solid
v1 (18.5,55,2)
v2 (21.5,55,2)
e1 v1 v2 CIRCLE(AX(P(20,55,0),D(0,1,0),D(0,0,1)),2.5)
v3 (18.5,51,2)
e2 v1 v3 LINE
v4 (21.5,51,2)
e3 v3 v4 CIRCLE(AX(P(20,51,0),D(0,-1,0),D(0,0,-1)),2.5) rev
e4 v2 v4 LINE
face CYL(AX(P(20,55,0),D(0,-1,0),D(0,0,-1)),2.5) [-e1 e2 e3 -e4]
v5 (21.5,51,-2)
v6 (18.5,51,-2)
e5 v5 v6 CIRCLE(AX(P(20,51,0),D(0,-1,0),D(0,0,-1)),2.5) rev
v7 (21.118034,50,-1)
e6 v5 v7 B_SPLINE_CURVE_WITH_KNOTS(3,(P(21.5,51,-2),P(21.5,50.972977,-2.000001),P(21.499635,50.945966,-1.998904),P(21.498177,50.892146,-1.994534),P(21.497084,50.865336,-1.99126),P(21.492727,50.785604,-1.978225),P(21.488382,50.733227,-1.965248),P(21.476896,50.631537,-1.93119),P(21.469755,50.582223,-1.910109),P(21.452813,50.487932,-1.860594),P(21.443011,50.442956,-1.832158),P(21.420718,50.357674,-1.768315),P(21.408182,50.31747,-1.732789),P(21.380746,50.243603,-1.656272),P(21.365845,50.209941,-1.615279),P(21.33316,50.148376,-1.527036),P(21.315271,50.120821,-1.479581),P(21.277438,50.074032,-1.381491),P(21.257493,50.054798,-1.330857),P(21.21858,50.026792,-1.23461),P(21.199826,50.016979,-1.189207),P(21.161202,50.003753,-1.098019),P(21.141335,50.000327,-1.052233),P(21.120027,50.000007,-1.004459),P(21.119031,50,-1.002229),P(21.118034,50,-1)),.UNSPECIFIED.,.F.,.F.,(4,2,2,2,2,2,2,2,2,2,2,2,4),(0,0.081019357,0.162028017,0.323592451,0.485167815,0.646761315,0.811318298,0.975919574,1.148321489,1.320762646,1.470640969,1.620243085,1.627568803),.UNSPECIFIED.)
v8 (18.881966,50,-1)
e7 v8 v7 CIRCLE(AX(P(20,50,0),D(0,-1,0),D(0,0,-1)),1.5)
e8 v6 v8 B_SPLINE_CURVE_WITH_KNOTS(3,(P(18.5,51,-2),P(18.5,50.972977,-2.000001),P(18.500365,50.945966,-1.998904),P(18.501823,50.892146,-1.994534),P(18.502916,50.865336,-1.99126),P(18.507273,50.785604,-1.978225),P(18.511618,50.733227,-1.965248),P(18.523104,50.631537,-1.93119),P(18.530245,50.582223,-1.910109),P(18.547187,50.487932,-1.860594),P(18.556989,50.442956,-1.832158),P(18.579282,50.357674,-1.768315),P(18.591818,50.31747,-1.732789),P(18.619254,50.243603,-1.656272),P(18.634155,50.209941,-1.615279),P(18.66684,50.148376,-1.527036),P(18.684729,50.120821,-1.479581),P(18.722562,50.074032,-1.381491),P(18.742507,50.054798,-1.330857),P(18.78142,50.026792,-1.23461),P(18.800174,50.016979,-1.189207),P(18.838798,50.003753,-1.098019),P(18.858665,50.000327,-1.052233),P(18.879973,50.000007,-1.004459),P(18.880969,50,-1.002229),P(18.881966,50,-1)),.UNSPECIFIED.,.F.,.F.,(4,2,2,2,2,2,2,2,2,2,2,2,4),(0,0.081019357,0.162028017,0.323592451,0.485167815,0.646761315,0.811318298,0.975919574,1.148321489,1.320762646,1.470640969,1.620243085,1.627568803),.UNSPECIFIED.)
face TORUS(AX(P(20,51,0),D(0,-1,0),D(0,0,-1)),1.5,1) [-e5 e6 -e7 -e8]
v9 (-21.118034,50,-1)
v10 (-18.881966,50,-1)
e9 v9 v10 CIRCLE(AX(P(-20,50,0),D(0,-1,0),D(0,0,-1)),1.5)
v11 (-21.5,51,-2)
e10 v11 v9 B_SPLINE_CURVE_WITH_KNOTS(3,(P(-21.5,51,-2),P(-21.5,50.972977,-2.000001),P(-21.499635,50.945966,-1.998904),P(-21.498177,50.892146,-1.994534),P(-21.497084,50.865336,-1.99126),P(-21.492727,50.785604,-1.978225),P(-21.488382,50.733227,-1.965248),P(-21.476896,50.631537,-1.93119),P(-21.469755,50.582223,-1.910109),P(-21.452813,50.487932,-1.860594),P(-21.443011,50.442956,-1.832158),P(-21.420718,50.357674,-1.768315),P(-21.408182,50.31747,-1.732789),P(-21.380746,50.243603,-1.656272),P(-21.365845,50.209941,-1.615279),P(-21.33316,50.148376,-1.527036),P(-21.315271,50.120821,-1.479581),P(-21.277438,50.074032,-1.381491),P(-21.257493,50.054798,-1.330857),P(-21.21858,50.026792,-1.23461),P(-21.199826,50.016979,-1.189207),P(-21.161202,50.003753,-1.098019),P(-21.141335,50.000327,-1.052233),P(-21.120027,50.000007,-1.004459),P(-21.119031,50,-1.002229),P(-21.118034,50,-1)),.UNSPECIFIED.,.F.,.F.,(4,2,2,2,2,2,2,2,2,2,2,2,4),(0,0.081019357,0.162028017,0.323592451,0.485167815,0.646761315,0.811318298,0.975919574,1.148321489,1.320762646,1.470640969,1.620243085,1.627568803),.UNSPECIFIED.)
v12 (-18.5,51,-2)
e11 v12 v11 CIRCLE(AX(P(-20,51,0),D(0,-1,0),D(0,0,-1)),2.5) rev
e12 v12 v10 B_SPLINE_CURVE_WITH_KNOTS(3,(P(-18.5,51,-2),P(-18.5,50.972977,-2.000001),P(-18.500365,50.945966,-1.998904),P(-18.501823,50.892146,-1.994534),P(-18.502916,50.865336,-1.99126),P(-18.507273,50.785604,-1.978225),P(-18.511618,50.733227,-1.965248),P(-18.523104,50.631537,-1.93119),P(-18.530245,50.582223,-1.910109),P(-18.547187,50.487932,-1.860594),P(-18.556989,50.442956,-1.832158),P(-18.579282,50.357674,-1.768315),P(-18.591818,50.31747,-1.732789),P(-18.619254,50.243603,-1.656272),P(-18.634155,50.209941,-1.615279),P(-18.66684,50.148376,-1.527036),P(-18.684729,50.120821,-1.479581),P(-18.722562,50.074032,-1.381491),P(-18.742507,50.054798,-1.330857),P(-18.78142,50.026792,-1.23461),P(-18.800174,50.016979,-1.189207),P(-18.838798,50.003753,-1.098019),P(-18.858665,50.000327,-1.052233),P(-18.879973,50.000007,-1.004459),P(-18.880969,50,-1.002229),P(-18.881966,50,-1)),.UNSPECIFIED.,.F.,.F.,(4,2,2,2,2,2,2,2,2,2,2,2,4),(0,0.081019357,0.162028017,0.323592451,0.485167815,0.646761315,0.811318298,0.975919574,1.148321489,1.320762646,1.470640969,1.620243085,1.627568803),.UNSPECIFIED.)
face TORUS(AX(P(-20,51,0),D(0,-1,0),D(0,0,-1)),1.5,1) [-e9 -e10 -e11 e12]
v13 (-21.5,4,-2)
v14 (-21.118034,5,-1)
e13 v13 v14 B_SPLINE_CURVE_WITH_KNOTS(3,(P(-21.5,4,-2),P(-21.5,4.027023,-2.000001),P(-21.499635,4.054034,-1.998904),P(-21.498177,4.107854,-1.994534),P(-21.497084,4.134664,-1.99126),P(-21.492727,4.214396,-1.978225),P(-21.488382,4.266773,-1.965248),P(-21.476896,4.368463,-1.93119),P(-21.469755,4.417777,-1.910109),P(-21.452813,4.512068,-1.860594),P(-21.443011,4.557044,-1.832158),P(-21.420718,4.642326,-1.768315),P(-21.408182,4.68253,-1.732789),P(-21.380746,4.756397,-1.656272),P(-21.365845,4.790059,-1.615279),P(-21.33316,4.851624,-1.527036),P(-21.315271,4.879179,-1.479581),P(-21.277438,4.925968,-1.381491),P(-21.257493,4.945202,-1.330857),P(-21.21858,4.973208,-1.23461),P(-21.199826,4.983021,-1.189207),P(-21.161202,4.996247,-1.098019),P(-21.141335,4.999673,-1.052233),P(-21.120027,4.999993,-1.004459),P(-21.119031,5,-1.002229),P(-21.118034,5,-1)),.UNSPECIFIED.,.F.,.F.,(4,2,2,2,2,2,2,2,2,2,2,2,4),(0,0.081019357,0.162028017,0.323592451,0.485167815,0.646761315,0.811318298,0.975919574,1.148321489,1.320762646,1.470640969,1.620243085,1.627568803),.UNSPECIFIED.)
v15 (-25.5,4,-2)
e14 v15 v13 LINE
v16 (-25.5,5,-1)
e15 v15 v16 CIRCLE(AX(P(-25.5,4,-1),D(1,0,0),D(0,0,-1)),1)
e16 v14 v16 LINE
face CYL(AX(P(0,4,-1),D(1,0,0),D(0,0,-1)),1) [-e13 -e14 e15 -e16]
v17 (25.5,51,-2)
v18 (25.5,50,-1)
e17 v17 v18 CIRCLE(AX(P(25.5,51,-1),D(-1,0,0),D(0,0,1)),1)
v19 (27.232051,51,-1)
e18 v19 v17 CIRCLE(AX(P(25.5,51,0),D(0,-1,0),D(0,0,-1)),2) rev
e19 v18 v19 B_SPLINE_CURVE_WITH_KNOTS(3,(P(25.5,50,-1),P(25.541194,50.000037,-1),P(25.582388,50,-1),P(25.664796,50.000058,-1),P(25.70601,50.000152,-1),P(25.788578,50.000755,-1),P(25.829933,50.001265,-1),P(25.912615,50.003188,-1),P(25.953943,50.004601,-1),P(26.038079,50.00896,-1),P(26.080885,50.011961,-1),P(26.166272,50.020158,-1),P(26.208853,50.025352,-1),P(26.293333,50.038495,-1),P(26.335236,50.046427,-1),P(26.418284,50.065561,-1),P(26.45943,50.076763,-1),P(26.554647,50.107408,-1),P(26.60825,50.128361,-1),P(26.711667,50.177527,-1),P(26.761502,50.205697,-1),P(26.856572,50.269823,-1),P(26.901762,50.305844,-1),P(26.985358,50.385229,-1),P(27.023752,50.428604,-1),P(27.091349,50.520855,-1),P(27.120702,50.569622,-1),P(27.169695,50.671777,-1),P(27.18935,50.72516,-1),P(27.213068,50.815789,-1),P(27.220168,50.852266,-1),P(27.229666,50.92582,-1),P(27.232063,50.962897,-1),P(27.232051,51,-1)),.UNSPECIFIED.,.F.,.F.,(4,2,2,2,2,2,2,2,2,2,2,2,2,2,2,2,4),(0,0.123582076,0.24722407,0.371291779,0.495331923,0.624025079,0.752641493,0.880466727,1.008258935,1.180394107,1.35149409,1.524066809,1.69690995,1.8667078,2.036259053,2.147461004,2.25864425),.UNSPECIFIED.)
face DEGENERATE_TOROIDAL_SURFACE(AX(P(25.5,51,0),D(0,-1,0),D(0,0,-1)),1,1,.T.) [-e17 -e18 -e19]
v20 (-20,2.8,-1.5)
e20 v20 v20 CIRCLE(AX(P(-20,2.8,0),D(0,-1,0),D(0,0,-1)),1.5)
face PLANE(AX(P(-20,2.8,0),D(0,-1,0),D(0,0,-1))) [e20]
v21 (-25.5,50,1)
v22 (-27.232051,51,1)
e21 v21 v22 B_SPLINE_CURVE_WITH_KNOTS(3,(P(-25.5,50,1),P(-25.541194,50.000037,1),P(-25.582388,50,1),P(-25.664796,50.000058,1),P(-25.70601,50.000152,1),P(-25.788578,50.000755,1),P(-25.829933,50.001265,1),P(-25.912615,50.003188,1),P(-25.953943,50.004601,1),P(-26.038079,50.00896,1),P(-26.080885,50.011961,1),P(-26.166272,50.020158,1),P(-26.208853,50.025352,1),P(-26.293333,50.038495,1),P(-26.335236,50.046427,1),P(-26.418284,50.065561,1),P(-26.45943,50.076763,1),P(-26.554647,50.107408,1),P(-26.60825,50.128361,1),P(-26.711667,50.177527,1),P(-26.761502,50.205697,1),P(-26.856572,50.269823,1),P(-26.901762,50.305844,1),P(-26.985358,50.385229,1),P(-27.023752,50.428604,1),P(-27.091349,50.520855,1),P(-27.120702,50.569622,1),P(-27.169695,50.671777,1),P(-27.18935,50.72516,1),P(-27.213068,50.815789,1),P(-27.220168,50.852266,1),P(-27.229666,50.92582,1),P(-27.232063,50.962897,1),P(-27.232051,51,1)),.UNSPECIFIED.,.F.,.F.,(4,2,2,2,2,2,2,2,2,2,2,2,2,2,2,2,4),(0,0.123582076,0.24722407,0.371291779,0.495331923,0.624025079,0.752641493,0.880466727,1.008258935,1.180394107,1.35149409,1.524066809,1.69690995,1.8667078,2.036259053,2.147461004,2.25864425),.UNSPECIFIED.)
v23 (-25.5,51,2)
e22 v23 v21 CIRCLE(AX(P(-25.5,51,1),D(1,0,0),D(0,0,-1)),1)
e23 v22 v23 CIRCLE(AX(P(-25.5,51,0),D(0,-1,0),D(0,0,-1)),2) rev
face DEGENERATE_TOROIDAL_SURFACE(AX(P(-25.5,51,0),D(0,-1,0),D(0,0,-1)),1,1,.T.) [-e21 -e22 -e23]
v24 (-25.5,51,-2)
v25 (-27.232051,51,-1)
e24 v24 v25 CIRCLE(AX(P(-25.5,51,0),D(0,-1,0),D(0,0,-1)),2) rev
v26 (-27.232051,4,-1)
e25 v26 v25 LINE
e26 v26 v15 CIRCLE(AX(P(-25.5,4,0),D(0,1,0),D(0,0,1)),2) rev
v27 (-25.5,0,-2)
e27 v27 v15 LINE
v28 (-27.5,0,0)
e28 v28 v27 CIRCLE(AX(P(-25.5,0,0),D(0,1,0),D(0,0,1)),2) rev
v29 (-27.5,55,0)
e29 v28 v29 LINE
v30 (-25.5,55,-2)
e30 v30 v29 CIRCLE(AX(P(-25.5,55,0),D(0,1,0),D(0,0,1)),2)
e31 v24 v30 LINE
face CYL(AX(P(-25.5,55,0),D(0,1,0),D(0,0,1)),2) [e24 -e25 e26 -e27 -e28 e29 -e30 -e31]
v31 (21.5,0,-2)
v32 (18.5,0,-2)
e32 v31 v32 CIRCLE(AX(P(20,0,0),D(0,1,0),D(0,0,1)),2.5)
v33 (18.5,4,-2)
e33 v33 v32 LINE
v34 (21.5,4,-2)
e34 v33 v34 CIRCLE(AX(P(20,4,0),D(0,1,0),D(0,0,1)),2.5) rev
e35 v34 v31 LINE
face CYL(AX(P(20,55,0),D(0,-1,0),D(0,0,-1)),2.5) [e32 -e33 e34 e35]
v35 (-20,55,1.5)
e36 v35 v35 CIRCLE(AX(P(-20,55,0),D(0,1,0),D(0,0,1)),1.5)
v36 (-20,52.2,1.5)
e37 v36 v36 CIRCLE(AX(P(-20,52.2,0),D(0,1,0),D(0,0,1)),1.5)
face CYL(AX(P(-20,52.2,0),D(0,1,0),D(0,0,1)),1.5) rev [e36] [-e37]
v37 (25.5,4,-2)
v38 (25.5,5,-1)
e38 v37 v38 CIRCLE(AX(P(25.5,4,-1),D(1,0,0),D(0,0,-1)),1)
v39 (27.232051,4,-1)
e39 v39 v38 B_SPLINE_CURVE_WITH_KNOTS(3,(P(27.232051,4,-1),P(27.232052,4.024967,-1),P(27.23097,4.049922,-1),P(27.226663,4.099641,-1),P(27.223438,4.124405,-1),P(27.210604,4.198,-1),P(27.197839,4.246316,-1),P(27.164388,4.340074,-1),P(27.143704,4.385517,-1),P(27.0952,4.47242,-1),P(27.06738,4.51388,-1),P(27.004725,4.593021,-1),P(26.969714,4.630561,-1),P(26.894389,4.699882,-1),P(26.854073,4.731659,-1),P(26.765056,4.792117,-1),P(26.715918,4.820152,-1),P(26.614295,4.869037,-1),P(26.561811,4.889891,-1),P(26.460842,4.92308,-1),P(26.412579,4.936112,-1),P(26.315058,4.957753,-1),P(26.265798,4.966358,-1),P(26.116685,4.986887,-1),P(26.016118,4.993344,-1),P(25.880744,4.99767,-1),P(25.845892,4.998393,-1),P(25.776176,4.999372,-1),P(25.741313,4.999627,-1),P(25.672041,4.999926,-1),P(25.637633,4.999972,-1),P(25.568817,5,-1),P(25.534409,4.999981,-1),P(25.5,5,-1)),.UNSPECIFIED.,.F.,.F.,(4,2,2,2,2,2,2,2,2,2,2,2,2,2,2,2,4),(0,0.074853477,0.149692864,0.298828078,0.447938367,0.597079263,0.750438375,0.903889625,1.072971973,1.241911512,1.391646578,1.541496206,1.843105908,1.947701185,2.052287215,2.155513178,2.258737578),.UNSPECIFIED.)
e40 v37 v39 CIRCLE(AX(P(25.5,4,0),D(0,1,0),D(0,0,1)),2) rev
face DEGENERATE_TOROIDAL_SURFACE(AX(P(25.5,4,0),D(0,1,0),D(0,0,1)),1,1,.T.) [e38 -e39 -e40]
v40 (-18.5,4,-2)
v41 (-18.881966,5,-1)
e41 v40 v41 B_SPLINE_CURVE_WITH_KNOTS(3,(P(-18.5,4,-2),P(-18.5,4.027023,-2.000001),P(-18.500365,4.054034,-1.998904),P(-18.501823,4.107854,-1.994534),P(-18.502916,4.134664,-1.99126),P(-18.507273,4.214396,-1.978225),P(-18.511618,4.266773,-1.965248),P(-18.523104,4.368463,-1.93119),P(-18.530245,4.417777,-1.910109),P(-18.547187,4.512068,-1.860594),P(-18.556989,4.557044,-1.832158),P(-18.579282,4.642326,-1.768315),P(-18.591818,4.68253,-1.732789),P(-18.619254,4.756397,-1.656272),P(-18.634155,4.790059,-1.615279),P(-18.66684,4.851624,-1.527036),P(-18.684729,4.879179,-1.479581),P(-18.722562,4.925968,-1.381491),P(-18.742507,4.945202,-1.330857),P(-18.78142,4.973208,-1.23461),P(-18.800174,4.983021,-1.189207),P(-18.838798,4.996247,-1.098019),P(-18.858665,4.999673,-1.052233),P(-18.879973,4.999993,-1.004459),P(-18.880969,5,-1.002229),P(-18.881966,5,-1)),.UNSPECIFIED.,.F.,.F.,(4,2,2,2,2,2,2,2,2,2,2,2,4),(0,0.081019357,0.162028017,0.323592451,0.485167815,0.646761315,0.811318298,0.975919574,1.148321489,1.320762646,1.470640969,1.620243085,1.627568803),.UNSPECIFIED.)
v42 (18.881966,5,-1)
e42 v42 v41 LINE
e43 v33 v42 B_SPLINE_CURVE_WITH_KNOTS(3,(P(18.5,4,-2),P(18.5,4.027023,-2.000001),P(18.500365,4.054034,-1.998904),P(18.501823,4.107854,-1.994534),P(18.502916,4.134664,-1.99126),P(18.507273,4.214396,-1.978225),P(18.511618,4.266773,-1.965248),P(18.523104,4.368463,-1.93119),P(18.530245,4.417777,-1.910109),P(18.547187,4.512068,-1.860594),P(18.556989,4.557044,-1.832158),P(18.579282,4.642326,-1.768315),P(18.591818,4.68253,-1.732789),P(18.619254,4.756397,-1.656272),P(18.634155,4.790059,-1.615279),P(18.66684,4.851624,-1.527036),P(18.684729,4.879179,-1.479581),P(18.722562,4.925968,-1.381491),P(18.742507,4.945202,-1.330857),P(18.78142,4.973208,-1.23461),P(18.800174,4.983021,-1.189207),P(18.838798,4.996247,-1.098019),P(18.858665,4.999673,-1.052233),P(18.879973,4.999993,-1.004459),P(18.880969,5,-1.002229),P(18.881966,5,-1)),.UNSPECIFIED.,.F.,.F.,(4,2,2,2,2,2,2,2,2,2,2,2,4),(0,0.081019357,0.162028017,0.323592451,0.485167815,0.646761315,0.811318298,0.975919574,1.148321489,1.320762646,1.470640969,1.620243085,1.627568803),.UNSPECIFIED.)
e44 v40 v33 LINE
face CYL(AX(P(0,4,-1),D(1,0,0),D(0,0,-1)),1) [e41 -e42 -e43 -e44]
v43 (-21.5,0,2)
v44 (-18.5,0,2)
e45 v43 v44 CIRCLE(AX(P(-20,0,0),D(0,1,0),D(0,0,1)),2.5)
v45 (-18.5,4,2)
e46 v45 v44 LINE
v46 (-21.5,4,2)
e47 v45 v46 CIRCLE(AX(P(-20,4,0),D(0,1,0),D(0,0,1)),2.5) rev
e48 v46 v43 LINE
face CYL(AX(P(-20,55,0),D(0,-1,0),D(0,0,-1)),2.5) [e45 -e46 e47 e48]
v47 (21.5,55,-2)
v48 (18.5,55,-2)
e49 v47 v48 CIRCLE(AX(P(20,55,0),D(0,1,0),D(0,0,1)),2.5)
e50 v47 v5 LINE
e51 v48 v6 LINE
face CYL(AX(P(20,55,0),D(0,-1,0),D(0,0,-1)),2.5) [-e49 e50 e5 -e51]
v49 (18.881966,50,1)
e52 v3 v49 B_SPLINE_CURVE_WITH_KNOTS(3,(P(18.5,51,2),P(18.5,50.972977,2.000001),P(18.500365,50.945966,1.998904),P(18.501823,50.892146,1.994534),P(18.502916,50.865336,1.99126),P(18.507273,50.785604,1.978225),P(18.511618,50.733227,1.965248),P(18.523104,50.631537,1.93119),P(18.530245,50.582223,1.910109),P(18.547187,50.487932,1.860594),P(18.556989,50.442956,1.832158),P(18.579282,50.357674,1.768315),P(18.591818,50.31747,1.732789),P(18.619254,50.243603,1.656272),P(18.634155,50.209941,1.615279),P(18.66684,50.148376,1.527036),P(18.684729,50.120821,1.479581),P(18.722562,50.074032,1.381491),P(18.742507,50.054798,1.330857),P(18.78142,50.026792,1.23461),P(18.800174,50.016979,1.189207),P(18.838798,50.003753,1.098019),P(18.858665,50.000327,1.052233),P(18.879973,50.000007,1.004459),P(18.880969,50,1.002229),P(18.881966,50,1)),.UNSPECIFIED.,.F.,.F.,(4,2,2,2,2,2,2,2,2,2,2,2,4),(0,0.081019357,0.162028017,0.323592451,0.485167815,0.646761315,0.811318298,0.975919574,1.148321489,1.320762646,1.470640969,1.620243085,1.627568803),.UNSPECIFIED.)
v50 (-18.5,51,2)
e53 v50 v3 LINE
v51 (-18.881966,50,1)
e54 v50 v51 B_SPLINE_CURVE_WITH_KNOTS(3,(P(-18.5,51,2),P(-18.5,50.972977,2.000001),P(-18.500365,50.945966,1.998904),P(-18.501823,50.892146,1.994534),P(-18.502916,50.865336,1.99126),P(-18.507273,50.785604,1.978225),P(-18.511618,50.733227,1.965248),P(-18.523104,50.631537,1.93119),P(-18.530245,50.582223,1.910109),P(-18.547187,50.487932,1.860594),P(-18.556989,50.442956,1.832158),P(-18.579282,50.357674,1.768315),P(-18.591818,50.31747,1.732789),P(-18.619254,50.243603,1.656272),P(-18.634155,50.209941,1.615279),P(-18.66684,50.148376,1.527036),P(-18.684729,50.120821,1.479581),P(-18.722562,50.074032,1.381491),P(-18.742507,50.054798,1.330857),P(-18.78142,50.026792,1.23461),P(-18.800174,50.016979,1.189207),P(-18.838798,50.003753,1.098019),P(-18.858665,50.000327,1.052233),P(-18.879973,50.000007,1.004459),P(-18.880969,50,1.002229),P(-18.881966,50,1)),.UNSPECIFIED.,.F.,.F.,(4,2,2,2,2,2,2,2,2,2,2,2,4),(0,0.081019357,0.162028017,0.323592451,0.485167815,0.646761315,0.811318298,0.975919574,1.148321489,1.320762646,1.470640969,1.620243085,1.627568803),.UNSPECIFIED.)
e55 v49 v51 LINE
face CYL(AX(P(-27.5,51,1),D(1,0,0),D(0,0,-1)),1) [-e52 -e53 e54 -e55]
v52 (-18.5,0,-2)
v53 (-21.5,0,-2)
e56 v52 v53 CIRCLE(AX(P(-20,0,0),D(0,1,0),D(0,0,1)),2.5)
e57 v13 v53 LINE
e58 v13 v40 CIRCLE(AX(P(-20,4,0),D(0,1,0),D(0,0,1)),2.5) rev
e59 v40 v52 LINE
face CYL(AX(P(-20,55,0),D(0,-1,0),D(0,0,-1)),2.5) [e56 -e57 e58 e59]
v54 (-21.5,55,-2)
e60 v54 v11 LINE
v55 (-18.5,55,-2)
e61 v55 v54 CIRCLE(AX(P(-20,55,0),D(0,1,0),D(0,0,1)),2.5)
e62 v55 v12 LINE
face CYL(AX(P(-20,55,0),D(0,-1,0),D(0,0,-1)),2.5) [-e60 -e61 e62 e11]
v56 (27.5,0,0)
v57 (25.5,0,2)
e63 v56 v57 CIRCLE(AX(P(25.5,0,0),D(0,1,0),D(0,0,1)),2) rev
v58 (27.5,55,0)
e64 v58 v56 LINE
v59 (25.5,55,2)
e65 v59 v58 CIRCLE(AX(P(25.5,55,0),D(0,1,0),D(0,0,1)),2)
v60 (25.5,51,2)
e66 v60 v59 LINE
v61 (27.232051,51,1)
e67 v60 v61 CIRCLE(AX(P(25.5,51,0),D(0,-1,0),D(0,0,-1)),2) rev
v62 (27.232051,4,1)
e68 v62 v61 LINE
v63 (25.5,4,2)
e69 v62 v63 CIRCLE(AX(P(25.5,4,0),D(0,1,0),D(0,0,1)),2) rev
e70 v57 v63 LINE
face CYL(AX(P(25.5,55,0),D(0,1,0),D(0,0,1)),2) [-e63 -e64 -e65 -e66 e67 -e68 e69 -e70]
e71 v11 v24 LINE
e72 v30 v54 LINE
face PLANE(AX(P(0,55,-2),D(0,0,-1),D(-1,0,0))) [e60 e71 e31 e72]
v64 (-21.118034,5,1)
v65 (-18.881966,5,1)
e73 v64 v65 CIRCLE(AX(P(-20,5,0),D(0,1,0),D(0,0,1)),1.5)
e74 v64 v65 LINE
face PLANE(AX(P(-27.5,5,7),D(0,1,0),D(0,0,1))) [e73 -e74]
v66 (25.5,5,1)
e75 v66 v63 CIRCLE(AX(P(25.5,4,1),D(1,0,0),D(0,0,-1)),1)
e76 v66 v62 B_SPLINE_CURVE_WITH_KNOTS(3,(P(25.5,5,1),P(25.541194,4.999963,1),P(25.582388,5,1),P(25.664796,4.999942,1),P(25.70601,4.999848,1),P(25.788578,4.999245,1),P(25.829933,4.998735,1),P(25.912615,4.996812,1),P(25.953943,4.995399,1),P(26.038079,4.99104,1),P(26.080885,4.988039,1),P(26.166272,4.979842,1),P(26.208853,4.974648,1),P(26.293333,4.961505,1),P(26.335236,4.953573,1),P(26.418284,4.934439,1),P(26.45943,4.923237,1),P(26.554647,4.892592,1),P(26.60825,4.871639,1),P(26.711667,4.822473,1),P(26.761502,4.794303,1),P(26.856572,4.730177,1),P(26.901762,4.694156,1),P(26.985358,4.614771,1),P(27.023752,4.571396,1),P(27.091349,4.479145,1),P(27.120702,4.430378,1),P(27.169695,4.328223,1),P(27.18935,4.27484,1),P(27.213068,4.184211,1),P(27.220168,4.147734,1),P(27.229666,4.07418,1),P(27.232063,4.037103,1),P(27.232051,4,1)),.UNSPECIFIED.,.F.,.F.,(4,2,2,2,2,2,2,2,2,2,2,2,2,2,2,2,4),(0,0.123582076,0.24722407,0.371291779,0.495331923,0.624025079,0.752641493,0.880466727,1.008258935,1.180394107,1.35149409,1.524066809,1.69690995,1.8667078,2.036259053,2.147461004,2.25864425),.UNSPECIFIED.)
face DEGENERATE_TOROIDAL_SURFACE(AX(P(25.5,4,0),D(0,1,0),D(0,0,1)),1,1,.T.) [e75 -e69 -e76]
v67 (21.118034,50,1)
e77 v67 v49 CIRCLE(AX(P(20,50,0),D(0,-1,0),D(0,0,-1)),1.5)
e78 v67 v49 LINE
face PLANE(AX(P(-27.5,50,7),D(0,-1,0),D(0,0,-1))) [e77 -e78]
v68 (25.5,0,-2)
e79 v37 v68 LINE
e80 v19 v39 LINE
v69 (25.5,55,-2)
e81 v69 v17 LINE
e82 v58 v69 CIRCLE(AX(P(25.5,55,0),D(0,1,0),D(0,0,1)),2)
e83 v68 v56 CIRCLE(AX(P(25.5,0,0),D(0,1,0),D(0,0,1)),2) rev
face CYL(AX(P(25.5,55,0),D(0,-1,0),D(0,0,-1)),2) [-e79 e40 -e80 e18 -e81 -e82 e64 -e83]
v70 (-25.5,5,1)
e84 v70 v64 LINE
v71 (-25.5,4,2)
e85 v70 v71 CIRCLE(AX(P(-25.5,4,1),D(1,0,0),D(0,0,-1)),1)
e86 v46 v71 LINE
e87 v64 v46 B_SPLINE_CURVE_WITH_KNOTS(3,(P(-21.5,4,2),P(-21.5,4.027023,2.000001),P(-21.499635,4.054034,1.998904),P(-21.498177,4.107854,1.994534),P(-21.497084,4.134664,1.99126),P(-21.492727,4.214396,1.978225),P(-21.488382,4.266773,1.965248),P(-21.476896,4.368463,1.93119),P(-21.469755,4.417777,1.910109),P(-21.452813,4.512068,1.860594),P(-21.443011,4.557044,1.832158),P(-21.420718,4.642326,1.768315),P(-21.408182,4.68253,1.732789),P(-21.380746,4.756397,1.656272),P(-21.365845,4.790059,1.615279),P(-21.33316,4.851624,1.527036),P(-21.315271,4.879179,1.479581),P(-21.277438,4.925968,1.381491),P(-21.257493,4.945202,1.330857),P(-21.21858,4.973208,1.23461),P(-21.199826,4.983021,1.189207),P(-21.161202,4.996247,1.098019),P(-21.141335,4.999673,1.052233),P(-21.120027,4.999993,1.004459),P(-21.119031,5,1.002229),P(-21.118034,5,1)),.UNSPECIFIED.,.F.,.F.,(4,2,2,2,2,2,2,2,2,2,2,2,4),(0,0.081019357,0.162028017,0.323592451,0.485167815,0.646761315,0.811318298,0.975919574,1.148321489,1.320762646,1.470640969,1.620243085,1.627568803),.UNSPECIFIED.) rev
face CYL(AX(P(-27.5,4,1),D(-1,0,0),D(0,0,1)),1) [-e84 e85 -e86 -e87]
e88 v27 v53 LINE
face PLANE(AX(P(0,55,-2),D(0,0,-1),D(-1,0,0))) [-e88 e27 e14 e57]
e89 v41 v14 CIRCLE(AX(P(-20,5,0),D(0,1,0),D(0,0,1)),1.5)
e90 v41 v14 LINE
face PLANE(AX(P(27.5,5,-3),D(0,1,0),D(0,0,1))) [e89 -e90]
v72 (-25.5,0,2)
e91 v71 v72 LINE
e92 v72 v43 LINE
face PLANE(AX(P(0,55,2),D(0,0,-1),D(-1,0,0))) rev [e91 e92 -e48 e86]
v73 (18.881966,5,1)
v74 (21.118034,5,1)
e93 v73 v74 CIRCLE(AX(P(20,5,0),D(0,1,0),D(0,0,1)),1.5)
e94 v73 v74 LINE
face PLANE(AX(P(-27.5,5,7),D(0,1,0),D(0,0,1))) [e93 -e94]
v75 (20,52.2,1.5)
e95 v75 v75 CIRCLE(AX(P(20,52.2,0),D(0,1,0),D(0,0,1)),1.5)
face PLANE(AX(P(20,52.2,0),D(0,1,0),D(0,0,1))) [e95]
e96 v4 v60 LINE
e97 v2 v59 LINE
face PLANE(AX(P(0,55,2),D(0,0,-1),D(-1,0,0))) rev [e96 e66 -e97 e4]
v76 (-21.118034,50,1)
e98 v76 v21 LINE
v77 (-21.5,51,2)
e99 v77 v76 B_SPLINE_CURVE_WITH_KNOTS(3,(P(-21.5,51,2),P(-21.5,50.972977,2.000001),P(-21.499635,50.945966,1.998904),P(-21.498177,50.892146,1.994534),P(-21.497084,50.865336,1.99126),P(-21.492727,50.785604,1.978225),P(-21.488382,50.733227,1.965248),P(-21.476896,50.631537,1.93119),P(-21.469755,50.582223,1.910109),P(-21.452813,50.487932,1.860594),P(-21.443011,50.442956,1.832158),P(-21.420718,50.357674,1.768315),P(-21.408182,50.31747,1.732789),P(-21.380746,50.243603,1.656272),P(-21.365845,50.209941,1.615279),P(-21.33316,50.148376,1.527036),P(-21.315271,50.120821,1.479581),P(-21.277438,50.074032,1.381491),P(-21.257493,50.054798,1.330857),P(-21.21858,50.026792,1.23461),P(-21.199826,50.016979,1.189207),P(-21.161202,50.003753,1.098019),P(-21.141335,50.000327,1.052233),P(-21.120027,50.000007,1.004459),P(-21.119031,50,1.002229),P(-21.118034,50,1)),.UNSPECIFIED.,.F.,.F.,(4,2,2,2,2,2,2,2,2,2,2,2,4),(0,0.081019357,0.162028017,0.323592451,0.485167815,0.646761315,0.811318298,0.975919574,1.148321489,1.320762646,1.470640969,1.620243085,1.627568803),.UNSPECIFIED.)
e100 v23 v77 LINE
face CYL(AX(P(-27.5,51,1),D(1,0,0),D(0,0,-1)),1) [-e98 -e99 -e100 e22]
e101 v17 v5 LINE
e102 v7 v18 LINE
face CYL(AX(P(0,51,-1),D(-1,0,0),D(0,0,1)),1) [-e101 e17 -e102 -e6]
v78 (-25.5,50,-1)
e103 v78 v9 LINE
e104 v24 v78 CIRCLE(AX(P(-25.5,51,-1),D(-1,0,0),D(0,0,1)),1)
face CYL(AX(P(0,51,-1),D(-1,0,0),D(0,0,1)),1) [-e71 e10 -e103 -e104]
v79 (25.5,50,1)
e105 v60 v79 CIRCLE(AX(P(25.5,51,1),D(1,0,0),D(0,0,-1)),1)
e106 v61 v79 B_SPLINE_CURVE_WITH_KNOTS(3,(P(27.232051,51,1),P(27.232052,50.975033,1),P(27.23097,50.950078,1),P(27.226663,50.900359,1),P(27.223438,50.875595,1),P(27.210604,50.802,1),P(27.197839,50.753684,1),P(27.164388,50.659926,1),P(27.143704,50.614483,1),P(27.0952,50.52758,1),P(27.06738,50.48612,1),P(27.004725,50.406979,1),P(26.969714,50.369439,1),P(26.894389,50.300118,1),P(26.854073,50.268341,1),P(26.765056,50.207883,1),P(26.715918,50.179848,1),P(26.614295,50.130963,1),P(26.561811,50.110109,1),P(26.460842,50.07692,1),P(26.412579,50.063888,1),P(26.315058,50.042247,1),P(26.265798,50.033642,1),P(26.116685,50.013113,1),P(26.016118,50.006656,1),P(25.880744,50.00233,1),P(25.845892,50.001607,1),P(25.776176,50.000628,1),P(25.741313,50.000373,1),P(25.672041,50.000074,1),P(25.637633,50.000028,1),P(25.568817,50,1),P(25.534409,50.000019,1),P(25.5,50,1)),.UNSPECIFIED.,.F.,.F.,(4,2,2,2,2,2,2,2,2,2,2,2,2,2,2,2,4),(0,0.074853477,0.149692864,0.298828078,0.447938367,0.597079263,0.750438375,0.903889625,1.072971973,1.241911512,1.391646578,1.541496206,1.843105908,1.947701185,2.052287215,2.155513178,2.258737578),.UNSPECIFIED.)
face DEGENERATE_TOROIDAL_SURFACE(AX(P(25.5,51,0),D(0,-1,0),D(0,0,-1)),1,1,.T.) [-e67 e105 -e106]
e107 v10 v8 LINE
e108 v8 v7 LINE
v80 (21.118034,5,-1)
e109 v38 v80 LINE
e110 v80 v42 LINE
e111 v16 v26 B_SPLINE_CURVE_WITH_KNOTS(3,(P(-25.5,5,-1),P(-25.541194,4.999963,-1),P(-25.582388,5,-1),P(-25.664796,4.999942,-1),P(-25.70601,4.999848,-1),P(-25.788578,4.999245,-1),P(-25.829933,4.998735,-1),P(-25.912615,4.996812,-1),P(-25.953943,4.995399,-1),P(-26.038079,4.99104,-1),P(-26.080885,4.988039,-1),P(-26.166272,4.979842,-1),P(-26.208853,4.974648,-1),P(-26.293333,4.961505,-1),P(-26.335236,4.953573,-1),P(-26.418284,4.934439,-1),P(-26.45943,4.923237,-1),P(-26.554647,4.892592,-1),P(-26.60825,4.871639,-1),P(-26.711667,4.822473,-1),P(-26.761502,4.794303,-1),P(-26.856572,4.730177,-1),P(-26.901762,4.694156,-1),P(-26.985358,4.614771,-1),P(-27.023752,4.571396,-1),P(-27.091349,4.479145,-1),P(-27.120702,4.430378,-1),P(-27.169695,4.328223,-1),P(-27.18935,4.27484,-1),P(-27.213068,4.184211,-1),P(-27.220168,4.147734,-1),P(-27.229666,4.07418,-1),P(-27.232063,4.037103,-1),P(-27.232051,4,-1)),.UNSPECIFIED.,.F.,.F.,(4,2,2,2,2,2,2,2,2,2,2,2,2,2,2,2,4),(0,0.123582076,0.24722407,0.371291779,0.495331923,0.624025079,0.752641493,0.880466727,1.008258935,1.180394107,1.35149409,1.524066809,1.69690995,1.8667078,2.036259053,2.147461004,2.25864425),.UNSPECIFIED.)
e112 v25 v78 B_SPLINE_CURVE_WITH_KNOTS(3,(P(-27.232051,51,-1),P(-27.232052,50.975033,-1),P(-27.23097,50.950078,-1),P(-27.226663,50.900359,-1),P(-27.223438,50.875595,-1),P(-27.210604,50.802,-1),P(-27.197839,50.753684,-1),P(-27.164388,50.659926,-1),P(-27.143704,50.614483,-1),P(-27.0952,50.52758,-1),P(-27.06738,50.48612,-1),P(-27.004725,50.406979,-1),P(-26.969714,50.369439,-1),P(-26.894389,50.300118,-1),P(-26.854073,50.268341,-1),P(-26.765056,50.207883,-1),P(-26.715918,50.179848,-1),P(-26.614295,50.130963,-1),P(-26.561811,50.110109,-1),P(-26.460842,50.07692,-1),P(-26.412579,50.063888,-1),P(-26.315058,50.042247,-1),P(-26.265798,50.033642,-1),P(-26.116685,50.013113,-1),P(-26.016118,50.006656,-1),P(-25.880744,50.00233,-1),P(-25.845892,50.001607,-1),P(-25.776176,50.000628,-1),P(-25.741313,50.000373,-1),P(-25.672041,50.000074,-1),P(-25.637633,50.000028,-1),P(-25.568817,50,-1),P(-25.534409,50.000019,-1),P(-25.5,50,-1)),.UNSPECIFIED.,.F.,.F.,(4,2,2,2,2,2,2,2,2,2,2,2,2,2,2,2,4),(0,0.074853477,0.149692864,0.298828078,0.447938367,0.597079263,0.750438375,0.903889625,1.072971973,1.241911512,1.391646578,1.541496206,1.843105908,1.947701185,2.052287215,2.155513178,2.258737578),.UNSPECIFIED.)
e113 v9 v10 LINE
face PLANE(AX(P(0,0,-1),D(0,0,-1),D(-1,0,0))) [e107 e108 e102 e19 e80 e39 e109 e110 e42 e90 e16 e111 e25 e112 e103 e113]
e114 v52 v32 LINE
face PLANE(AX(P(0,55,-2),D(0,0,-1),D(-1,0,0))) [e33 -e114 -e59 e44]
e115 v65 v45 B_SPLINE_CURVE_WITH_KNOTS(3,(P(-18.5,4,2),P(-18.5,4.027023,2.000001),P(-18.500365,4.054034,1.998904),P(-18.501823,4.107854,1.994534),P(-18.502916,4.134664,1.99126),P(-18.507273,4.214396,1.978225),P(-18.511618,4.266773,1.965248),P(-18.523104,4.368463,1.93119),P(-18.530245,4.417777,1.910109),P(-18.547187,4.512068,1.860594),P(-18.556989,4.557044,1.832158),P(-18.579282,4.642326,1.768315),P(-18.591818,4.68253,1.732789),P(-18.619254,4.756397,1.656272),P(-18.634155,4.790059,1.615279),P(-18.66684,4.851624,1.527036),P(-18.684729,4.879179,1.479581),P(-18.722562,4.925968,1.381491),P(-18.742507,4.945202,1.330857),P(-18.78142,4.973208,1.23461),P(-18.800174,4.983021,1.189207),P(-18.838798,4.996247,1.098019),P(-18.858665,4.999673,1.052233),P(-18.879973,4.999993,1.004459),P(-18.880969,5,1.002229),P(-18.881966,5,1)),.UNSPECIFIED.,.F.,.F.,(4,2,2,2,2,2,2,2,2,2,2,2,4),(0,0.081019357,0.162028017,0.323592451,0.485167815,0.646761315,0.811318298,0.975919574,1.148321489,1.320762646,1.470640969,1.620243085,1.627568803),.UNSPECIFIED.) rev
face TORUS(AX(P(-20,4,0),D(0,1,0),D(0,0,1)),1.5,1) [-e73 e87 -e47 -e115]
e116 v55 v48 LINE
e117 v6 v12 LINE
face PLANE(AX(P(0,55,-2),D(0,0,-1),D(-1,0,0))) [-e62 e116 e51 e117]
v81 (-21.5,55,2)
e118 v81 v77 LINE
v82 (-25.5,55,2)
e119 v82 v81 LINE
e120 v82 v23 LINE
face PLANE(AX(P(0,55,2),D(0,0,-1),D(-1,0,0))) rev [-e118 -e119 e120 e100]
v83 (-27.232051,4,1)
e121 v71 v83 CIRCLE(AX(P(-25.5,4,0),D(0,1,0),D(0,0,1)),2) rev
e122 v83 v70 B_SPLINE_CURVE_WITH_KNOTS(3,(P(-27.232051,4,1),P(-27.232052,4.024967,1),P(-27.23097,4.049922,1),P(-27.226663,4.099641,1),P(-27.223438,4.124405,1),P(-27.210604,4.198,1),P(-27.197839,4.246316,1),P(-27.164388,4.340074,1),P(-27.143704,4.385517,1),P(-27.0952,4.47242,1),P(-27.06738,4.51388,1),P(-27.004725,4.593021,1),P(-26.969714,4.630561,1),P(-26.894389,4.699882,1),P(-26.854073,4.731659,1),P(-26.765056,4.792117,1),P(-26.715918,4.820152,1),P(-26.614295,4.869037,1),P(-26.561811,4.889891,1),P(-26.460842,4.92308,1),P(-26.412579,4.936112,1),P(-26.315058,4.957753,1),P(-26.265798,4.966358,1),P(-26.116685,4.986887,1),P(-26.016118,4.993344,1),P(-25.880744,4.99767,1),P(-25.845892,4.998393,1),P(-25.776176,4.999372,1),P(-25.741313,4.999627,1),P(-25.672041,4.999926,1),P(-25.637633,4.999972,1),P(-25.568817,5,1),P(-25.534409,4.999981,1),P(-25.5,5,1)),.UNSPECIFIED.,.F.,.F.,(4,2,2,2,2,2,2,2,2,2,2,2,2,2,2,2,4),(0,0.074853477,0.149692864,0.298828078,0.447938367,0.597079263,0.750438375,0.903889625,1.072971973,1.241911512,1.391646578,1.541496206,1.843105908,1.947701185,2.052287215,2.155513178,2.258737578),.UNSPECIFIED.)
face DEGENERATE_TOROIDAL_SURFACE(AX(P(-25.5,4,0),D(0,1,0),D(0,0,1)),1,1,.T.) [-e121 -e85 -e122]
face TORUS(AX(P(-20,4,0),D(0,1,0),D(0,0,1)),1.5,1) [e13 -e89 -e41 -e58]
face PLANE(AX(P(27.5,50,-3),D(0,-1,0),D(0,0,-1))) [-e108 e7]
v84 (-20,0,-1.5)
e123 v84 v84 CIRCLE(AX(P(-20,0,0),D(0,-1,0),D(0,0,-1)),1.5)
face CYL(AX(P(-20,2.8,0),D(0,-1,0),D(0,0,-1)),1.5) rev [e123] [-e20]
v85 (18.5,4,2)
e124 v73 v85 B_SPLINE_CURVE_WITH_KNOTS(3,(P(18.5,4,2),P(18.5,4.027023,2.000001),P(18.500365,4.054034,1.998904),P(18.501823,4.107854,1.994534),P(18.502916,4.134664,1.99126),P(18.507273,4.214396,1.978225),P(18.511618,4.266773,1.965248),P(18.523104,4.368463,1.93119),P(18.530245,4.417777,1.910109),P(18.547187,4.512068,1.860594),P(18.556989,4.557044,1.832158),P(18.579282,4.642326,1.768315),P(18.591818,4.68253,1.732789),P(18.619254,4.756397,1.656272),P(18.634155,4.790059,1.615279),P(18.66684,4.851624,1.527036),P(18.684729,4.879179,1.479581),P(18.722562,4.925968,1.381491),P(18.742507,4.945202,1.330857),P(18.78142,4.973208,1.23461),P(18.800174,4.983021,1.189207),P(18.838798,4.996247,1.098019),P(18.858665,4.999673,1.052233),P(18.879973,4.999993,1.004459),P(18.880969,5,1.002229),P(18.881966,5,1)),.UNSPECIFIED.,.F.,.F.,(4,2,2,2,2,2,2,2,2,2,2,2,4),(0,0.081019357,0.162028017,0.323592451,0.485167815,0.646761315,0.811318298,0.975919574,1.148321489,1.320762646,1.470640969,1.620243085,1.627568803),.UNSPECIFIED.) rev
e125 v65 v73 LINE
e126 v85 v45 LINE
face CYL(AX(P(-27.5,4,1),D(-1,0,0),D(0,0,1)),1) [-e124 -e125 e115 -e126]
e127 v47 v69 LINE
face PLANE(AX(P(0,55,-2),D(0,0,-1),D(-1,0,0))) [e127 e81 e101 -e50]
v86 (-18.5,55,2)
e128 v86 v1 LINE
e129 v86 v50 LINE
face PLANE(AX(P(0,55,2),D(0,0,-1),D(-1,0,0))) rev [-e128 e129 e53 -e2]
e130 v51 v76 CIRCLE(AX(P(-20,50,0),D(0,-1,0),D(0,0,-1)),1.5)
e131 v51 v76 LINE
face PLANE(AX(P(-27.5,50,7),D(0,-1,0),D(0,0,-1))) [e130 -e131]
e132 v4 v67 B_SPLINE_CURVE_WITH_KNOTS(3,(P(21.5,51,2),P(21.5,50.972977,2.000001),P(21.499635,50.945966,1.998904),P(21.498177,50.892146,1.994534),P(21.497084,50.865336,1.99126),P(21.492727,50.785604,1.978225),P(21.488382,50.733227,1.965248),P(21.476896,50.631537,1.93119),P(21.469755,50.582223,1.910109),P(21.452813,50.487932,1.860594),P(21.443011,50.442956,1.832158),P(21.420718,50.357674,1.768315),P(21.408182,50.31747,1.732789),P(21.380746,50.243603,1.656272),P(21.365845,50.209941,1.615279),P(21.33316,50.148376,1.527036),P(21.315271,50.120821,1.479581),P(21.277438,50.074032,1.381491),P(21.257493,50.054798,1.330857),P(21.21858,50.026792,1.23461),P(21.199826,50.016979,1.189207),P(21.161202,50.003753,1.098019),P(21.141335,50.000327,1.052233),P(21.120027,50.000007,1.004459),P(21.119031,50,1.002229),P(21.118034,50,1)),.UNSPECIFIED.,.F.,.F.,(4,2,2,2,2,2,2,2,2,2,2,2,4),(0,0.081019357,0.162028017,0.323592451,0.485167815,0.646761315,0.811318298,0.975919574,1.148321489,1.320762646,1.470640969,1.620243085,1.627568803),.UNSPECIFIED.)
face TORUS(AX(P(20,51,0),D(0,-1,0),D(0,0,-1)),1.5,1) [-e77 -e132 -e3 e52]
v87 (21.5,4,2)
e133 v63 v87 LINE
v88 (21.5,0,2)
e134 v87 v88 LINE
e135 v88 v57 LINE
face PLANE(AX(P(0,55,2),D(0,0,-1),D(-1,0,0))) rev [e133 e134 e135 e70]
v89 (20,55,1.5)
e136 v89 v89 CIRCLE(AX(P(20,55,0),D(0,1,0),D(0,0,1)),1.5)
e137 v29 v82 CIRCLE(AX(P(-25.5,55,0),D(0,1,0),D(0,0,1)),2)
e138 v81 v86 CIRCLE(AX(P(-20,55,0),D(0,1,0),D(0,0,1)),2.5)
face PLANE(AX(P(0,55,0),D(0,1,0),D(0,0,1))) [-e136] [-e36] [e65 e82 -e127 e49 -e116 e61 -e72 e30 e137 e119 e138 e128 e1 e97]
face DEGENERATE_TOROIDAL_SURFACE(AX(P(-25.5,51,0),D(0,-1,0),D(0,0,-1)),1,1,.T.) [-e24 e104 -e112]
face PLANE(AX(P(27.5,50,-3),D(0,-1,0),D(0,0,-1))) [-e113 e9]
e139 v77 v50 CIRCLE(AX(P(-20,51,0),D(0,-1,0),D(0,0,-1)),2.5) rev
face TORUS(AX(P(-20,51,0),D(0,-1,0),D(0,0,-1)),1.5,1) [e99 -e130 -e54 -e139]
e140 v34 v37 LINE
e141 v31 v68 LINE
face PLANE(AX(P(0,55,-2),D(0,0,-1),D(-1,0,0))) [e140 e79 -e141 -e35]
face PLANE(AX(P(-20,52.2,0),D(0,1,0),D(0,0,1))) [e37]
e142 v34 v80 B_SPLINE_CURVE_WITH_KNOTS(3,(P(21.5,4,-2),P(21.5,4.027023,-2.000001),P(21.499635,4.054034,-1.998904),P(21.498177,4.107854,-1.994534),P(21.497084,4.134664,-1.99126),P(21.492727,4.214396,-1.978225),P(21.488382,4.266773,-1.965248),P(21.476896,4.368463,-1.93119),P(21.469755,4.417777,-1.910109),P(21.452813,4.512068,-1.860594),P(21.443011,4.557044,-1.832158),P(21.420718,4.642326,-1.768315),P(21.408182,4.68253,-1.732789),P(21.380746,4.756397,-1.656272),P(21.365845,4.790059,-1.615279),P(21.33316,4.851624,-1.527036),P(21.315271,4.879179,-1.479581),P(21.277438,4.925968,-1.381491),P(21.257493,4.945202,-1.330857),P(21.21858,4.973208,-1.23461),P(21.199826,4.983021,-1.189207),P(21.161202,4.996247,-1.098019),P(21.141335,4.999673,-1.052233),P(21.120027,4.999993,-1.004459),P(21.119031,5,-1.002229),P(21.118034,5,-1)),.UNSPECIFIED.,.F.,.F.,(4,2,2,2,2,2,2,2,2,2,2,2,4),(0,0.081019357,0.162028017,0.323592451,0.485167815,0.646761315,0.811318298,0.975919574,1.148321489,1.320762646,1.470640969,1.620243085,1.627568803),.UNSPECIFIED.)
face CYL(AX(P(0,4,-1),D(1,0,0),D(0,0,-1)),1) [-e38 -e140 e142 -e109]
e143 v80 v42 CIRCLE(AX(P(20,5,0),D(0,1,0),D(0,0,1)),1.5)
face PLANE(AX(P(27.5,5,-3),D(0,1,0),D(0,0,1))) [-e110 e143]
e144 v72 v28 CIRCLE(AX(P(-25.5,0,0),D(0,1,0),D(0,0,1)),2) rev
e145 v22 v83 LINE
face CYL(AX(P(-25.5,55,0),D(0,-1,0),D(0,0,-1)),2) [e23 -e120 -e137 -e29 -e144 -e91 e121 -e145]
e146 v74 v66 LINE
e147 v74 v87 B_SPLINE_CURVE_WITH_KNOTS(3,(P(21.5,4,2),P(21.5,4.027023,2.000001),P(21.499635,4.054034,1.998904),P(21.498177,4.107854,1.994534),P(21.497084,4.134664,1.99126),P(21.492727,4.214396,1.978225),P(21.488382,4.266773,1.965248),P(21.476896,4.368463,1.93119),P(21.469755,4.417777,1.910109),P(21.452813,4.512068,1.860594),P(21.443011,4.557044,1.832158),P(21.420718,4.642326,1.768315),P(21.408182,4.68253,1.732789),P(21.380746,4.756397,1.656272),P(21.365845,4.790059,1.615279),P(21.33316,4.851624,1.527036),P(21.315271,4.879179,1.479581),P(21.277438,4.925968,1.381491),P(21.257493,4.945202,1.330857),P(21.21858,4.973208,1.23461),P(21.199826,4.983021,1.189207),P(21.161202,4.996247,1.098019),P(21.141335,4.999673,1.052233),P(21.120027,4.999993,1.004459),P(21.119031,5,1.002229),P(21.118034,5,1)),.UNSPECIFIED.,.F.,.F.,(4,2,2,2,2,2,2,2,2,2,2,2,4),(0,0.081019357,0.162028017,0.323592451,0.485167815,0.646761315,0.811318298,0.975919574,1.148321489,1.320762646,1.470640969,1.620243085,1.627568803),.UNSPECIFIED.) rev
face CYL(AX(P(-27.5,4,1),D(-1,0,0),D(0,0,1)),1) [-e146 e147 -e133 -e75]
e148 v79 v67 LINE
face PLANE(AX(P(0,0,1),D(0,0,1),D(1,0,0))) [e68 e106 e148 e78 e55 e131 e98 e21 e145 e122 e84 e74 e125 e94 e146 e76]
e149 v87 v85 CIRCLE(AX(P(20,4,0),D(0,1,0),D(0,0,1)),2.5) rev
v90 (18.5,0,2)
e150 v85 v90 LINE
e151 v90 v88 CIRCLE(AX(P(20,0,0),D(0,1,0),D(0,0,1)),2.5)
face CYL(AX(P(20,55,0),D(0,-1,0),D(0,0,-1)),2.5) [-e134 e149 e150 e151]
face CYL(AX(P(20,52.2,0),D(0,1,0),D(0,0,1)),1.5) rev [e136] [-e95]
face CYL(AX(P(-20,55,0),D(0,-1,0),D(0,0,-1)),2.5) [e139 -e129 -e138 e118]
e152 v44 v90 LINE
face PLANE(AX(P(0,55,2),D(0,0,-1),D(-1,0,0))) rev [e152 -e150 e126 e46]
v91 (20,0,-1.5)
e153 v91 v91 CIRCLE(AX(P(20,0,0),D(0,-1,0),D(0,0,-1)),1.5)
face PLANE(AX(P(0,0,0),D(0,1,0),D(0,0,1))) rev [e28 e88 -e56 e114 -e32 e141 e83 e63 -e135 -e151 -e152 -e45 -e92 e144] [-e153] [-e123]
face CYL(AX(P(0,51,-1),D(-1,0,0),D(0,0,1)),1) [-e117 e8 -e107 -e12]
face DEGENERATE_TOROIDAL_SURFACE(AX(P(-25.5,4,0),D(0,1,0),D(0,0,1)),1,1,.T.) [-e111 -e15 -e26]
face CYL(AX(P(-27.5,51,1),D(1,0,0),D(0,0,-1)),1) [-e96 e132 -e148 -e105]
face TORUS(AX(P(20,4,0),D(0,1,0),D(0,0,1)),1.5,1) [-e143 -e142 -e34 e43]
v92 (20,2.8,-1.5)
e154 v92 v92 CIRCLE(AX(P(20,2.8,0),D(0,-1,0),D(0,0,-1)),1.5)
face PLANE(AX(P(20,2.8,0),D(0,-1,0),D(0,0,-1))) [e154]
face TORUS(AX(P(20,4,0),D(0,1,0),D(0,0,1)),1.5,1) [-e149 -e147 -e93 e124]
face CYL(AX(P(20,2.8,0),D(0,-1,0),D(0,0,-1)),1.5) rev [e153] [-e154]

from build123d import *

# Parameters (mm, degrees)
BOSS_EXTRUDE1_DEPTH     = 55
SKETCH2_R               = 1.5000000000000007
CUT_EXTRUDE1_DEPTH      = 2.8
CUT_EXTRUDE2_START      = -2.8
SKETCH3_R               = 1.5000000000000007
CUT_EXTRUDE2_DEPTH      = 2.8
CUT_EXTRUDE3_DEPTH      = 5
CUT_EXTRUDE3_DEPTH_BACK = 1
CUT_EXTRUDE4_DEPTH      = 1
CUT_EXTRUDE4_DEPTH_BACK = 1
FILLET1_R               = 2
FILLET2_R               = 1


with BuildPart() as part:
    # Sketch1 → Boss-Extrude1 (new body)
    with BuildSketch(Plane(origin=(0, 0, 0), x_dir=(1, 0, 0), z_dir=(0, 1, 0))):
        with BuildLine():
            Line((-18.500000000000032, 1.9999999999999996), (-21.500000000000068, 1.9999999999999996))
            ThreePointArc((-21.500000000000053, 1.9999999999999463), (-22.499999999999986, -1.91e-15), (-21.50000000000005, -1.9999999999999476))
            Line((-21.500000000000064, -2.0000000000000004), (-18.500000000000036, -2.0000000000000004))
            ThreePointArc((-18.50000000000003, -2.0000000000000226), (-17.763932022500214, -1.1180339887499129), (-17.499999999999993, -6.1e-16))
            ThreePointArc((-17.499999999999993, 0), (-17.763932022500214, 1.1180339887499113), (-18.500000000000025, 2.0000000000000213))
        make_face()
        with BuildLine():
            ThreePointArc((-18.500000000000025, 2.000000000000021), (-20.00000000000005, 2.4999999999999947), (-21.500000000000053, 1.9999999999999463))
            Line((-21.500000000000068, 1.9999999999999996), (-18.500000000000032, 1.9999999999999996))
        make_face()
        with BuildLine():
            Line((-18.500000000000036, -2.0000000000000004), (-21.500000000000064, -2.0000000000000004))
            ThreePointArc((-21.50000000000005, -1.9999999999999476), (-20.000000000000053, -2.4999999999999947), (-18.50000000000003, -2.0000000000000226))
        make_face()
        with BuildLine():
            Line((-21.500000000000068, 1.9999999999999996), (-27.49999999999999, 1.9999999999999996))
            Line((-27.49999999999999, 1.9999999999999996), (-27.49999999999999, -2.0000000000000004))
            Line((-27.49999999999999, -2.0000000000000004), (-21.500000000000064, -2.0000000000000004))
            ThreePointArc((-21.50000000000005, -1.9999999999999476), (-22.499999999999986, -1.91e-15), (-21.500000000000053, 1.9999999999999463))
        make_face()
        with BuildLine():
            Line((18.49999999999991, 1.9999999999999996), (-18.500000000000032, 1.9999999999999996))
            ThreePointArc((-18.500000000000025, 2.0000000000000213), (-17.763932022500214, 1.1180339887499113), (-17.499999999999993, 0))
            ThreePointArc((-17.499999999999993, -6.1e-16), (-17.763932022500214, -1.1180339887499129), (-18.50000000000003, -2.0000000000000226))
            Line((-18.500000000000036, -2.0000000000000004), (18.499999999999925, -2.0000000000000004))
            ThreePointArc((18.499999999999932, -1.9999999999999478), (17.5, -1.91e-15), (18.49999999999993, 1.9999999999999456))
        make_face()
        with BuildLine():
            ThreePointArc((21.49999999999997, 2.00000000000002), (19.99999999999994, 2.4999999999999982), (18.49999999999993, 1.9999999999999456))
            Line((18.49999999999991, 1.9999999999999996), (21.499999999999968, 1.9999999999999996))
        make_face()
        with BuildLine():
            Line((21.499999999999968, 1.9999999999999996), (18.49999999999991, 1.9999999999999996))
            ThreePointArc((18.49999999999993, 1.9999999999999456), (17.5, -1.91e-15), (18.499999999999932, -1.9999999999999478))
            Line((18.49999999999992, -2.0000000000000004), (21.499999999999954, -2.0000000000000004))
            ThreePointArc((21.499999999999964, -2.0000000000000244), (22.23606797749978, -1.1180339887499124), (22.5, -6.1e-16))
            ThreePointArc((22.5, 0), (22.23606797749978, 1.11803398874991), (21.49999999999997, 2.00000000000002))
        make_face()
        with BuildLine():
            Line((21.499999999999954, -2.0000000000000004), (18.49999999999992, -2.0000000000000004))
            ThreePointArc((18.499999999999932, -1.9999999999999478), (19.999999999999936, -2.4999999999999982), (21.499999999999964, -2.0000000000000244))
        make_face()
        with BuildLine():
            Line((27.50000000000001, 1.9999999999999996), (21.499999999999968, 1.9999999999999996))
            ThreePointArc((21.49999999999997, 2.00000000000002), (22.23606797749978, 1.11803398874991), (22.5, 0))
            ThreePointArc((22.5, -6.1e-16), (22.23606797749978, -1.1180339887499124), (21.499999999999964, -2.0000000000000244))
            Line((21.499999999999954, -2.0000000000000004), (27.50000000000001, -2.0000000000000004))
            Line((27.50000000000001, -2.0000000000000004), (27.50000000000001, 1.9999999999999996))
        make_face()
    extrude(amount=BOSS_EXTRUDE1_DEPTH)

    # Sketch2 → Cut-Extrude1 (cut)
    with BuildSketch(Plane(origin=(0, 55, 0), x_dir=(1, 0, 0), z_dir=(0, 1, 0))):
        with Locations(Location((-19.99999999999999, 0, 0), (0, 0, 270))):
            Circle(SKETCH2_R)
        with Locations(Location((20, 0, 0), (0, 0, 270))):
            Circle(SKETCH2_R)
    extrude(amount=-CUT_EXTRUDE1_DEPTH, mode=Mode.SUBTRACT)

    # Sketch3 → Cut-Extrude2 (cut)
    with BuildSketch(Plane.XZ.offset(CUT_EXTRUDE2_START)):
        with Locations(Location((-19.99999999999999, 0, 0), (0, 0, 90))):
            Circle(SKETCH3_R)
        with Locations(Location((20, 0, 0), (0, 0, 90))):
            Circle(SKETCH3_R)
    extrude(amount=CUT_EXTRUDE2_DEPTH, mode=Mode.SUBTRACT)

    # Sketch4 → Cut-Extrude3 (cut, two sides: drawn at the far end of the back side and taken through both)
    with BuildSketch(Plane.XY.offset(2.0000000000000004).offset(-CUT_EXTRUDE3_DEPTH_BACK)):
        Polygon((-27.500000000000018, 50), (27.500000000000007, 50), (27.50000000000001, 5.000000000000008), (-27.50000000000001, 5.000000000000008), align=None)
    extrude(amount=CUT_EXTRUDE3_DEPTH + CUT_EXTRUDE3_DEPTH_BACK, mode=Mode.SUBTRACT)

    # Sketch5 → Cut-Extrude4 (cut, two sides: drawn at the far end of the back side and taken through both)
    with BuildSketch(Plane(origin=(0, 0, -1.9999999999999996), x_dir=(-1, 0, 0), z_dir=(0, 0, -1)).offset(-CUT_EXTRUDE4_DEPTH_BACK)):
        Polygon((-27.49999999999999, 50), (27.49999999999999, 50), (27.499999999999986, 5.000000000000001), (-27.49999999999998, 5.000000000000001), align=None)
    extrude(amount=CUT_EXTRUDE4_DEPTH + CUT_EXTRUDE4_DEPTH_BACK, mode=Mode.SUBTRACT)

    # Fillet1
    fillet1_edges = [part.edges().sort_by_distance(p)[0] for p in [
        (-27.49999999999999, 52.5, 2.0000000000000004),
    ]]
    fillet(fillet1_edges, radius=FILLET1_R)
    fillet1_2_edges = [part.edges().sort_by_distance(p)[0] for p in [
        (-27.49999999999999, 2.5000000000000004, -1.9999999999999996),
    ]]
    fillet(fillet1_2_edges, radius=FILLET1_R - 0.0004)  # a hair under: the kernel refuses the full size
    fillet1_3_edges = [part.edges().sort_by_distance(p)[0] for p in [
        (27.50000000000001, 52.5, 2.0000000000000004),
    ]]
    fillet(fillet1_3_edges, radius=FILLET1_R)
    fillet1_4_edges = [part.edges().sort_by_distance(p)[0] for p in [
        (27.50000000000001, 2.5000000000000004, -1.9999999999999996),
    ]]
    fillet(fillet1_4_edges, radius=FILLET1_R - 0.0004)  # a hair under: the kernel refuses the full size

    # Fillet2
    fillet2_edges = [part.edges().sort_by_distance(p)[0] for p in [
        (-19.999999999999986, 50, -2.499999999999992),
        (19.999999999999996, 50, -2.500000000000009),
        (19.999999999999996, 5.000000000000001, -2.500000000000009),
        (-19.999999999999986, 5.000000000000001, -2.499999999999992),
        (-5.684e-14, 50, -1.9999999999999996),
        (23.500199999999992, 5.000000000000001, -1.9999999999999996),
        (-5.151e-14, 5.000000000000001, -1.9999999999999996),
        (23.500200169244646, 50, -1.9999999999999996),
        (-26.5002999949995, 50, -1.7320466614179624),
        (26.50030014156478, 50, -1.7320465767871778),
        (-23.500200000000024, 5.000000000000001, -1.9999999999999996),
        (-26.50029999499948, 5.000000000000001, -1.7320466614179733),
        (26.500299994999555, 5.000000000000001, -1.732046661417944),
        (-23.500000000000025, 5.000000000000008, 2.0000000000000004),
        (-26.49999999999999, 5.000000000000007, 1.7320508075688776),
        (26.500000103238282, 5.000000000000007, 1.7320507479642298),
        (23.499999999999982, 50, 2.0000000000000004),
        (-26.499999999999982, 50, 1.7320508075688823),
        (26.50000000000001, 50, 1.732050807568878),
        (-20.000000000000053, 50, 2.4999999999999925),
        (-23.50000000000002, 50, 2.0000000000000004),
        (19.999999999999932, 50, 2.499999999999999),
        (-5.329e-14, 50, 2.0000000000000004),
        (-20.000000000000053, 5.000000000000008, 2.4999999999999925),
        (-5.507e-14, 5.000000000000008, 2.0000000000000004),
        (19.999999999999932, 5.000000000000008, 2.499999999999999),
        (23.500000119209272, 5.000000000000008, 2.0000000000000004),
        (-23.500200000000024, 50, -1.9999999999999996),
    ]]
    fillet(fillet2_edges, radius=FILLET2_R - 0.0001)  # a hair under: the kernel refuses the full size


solid = part.part
